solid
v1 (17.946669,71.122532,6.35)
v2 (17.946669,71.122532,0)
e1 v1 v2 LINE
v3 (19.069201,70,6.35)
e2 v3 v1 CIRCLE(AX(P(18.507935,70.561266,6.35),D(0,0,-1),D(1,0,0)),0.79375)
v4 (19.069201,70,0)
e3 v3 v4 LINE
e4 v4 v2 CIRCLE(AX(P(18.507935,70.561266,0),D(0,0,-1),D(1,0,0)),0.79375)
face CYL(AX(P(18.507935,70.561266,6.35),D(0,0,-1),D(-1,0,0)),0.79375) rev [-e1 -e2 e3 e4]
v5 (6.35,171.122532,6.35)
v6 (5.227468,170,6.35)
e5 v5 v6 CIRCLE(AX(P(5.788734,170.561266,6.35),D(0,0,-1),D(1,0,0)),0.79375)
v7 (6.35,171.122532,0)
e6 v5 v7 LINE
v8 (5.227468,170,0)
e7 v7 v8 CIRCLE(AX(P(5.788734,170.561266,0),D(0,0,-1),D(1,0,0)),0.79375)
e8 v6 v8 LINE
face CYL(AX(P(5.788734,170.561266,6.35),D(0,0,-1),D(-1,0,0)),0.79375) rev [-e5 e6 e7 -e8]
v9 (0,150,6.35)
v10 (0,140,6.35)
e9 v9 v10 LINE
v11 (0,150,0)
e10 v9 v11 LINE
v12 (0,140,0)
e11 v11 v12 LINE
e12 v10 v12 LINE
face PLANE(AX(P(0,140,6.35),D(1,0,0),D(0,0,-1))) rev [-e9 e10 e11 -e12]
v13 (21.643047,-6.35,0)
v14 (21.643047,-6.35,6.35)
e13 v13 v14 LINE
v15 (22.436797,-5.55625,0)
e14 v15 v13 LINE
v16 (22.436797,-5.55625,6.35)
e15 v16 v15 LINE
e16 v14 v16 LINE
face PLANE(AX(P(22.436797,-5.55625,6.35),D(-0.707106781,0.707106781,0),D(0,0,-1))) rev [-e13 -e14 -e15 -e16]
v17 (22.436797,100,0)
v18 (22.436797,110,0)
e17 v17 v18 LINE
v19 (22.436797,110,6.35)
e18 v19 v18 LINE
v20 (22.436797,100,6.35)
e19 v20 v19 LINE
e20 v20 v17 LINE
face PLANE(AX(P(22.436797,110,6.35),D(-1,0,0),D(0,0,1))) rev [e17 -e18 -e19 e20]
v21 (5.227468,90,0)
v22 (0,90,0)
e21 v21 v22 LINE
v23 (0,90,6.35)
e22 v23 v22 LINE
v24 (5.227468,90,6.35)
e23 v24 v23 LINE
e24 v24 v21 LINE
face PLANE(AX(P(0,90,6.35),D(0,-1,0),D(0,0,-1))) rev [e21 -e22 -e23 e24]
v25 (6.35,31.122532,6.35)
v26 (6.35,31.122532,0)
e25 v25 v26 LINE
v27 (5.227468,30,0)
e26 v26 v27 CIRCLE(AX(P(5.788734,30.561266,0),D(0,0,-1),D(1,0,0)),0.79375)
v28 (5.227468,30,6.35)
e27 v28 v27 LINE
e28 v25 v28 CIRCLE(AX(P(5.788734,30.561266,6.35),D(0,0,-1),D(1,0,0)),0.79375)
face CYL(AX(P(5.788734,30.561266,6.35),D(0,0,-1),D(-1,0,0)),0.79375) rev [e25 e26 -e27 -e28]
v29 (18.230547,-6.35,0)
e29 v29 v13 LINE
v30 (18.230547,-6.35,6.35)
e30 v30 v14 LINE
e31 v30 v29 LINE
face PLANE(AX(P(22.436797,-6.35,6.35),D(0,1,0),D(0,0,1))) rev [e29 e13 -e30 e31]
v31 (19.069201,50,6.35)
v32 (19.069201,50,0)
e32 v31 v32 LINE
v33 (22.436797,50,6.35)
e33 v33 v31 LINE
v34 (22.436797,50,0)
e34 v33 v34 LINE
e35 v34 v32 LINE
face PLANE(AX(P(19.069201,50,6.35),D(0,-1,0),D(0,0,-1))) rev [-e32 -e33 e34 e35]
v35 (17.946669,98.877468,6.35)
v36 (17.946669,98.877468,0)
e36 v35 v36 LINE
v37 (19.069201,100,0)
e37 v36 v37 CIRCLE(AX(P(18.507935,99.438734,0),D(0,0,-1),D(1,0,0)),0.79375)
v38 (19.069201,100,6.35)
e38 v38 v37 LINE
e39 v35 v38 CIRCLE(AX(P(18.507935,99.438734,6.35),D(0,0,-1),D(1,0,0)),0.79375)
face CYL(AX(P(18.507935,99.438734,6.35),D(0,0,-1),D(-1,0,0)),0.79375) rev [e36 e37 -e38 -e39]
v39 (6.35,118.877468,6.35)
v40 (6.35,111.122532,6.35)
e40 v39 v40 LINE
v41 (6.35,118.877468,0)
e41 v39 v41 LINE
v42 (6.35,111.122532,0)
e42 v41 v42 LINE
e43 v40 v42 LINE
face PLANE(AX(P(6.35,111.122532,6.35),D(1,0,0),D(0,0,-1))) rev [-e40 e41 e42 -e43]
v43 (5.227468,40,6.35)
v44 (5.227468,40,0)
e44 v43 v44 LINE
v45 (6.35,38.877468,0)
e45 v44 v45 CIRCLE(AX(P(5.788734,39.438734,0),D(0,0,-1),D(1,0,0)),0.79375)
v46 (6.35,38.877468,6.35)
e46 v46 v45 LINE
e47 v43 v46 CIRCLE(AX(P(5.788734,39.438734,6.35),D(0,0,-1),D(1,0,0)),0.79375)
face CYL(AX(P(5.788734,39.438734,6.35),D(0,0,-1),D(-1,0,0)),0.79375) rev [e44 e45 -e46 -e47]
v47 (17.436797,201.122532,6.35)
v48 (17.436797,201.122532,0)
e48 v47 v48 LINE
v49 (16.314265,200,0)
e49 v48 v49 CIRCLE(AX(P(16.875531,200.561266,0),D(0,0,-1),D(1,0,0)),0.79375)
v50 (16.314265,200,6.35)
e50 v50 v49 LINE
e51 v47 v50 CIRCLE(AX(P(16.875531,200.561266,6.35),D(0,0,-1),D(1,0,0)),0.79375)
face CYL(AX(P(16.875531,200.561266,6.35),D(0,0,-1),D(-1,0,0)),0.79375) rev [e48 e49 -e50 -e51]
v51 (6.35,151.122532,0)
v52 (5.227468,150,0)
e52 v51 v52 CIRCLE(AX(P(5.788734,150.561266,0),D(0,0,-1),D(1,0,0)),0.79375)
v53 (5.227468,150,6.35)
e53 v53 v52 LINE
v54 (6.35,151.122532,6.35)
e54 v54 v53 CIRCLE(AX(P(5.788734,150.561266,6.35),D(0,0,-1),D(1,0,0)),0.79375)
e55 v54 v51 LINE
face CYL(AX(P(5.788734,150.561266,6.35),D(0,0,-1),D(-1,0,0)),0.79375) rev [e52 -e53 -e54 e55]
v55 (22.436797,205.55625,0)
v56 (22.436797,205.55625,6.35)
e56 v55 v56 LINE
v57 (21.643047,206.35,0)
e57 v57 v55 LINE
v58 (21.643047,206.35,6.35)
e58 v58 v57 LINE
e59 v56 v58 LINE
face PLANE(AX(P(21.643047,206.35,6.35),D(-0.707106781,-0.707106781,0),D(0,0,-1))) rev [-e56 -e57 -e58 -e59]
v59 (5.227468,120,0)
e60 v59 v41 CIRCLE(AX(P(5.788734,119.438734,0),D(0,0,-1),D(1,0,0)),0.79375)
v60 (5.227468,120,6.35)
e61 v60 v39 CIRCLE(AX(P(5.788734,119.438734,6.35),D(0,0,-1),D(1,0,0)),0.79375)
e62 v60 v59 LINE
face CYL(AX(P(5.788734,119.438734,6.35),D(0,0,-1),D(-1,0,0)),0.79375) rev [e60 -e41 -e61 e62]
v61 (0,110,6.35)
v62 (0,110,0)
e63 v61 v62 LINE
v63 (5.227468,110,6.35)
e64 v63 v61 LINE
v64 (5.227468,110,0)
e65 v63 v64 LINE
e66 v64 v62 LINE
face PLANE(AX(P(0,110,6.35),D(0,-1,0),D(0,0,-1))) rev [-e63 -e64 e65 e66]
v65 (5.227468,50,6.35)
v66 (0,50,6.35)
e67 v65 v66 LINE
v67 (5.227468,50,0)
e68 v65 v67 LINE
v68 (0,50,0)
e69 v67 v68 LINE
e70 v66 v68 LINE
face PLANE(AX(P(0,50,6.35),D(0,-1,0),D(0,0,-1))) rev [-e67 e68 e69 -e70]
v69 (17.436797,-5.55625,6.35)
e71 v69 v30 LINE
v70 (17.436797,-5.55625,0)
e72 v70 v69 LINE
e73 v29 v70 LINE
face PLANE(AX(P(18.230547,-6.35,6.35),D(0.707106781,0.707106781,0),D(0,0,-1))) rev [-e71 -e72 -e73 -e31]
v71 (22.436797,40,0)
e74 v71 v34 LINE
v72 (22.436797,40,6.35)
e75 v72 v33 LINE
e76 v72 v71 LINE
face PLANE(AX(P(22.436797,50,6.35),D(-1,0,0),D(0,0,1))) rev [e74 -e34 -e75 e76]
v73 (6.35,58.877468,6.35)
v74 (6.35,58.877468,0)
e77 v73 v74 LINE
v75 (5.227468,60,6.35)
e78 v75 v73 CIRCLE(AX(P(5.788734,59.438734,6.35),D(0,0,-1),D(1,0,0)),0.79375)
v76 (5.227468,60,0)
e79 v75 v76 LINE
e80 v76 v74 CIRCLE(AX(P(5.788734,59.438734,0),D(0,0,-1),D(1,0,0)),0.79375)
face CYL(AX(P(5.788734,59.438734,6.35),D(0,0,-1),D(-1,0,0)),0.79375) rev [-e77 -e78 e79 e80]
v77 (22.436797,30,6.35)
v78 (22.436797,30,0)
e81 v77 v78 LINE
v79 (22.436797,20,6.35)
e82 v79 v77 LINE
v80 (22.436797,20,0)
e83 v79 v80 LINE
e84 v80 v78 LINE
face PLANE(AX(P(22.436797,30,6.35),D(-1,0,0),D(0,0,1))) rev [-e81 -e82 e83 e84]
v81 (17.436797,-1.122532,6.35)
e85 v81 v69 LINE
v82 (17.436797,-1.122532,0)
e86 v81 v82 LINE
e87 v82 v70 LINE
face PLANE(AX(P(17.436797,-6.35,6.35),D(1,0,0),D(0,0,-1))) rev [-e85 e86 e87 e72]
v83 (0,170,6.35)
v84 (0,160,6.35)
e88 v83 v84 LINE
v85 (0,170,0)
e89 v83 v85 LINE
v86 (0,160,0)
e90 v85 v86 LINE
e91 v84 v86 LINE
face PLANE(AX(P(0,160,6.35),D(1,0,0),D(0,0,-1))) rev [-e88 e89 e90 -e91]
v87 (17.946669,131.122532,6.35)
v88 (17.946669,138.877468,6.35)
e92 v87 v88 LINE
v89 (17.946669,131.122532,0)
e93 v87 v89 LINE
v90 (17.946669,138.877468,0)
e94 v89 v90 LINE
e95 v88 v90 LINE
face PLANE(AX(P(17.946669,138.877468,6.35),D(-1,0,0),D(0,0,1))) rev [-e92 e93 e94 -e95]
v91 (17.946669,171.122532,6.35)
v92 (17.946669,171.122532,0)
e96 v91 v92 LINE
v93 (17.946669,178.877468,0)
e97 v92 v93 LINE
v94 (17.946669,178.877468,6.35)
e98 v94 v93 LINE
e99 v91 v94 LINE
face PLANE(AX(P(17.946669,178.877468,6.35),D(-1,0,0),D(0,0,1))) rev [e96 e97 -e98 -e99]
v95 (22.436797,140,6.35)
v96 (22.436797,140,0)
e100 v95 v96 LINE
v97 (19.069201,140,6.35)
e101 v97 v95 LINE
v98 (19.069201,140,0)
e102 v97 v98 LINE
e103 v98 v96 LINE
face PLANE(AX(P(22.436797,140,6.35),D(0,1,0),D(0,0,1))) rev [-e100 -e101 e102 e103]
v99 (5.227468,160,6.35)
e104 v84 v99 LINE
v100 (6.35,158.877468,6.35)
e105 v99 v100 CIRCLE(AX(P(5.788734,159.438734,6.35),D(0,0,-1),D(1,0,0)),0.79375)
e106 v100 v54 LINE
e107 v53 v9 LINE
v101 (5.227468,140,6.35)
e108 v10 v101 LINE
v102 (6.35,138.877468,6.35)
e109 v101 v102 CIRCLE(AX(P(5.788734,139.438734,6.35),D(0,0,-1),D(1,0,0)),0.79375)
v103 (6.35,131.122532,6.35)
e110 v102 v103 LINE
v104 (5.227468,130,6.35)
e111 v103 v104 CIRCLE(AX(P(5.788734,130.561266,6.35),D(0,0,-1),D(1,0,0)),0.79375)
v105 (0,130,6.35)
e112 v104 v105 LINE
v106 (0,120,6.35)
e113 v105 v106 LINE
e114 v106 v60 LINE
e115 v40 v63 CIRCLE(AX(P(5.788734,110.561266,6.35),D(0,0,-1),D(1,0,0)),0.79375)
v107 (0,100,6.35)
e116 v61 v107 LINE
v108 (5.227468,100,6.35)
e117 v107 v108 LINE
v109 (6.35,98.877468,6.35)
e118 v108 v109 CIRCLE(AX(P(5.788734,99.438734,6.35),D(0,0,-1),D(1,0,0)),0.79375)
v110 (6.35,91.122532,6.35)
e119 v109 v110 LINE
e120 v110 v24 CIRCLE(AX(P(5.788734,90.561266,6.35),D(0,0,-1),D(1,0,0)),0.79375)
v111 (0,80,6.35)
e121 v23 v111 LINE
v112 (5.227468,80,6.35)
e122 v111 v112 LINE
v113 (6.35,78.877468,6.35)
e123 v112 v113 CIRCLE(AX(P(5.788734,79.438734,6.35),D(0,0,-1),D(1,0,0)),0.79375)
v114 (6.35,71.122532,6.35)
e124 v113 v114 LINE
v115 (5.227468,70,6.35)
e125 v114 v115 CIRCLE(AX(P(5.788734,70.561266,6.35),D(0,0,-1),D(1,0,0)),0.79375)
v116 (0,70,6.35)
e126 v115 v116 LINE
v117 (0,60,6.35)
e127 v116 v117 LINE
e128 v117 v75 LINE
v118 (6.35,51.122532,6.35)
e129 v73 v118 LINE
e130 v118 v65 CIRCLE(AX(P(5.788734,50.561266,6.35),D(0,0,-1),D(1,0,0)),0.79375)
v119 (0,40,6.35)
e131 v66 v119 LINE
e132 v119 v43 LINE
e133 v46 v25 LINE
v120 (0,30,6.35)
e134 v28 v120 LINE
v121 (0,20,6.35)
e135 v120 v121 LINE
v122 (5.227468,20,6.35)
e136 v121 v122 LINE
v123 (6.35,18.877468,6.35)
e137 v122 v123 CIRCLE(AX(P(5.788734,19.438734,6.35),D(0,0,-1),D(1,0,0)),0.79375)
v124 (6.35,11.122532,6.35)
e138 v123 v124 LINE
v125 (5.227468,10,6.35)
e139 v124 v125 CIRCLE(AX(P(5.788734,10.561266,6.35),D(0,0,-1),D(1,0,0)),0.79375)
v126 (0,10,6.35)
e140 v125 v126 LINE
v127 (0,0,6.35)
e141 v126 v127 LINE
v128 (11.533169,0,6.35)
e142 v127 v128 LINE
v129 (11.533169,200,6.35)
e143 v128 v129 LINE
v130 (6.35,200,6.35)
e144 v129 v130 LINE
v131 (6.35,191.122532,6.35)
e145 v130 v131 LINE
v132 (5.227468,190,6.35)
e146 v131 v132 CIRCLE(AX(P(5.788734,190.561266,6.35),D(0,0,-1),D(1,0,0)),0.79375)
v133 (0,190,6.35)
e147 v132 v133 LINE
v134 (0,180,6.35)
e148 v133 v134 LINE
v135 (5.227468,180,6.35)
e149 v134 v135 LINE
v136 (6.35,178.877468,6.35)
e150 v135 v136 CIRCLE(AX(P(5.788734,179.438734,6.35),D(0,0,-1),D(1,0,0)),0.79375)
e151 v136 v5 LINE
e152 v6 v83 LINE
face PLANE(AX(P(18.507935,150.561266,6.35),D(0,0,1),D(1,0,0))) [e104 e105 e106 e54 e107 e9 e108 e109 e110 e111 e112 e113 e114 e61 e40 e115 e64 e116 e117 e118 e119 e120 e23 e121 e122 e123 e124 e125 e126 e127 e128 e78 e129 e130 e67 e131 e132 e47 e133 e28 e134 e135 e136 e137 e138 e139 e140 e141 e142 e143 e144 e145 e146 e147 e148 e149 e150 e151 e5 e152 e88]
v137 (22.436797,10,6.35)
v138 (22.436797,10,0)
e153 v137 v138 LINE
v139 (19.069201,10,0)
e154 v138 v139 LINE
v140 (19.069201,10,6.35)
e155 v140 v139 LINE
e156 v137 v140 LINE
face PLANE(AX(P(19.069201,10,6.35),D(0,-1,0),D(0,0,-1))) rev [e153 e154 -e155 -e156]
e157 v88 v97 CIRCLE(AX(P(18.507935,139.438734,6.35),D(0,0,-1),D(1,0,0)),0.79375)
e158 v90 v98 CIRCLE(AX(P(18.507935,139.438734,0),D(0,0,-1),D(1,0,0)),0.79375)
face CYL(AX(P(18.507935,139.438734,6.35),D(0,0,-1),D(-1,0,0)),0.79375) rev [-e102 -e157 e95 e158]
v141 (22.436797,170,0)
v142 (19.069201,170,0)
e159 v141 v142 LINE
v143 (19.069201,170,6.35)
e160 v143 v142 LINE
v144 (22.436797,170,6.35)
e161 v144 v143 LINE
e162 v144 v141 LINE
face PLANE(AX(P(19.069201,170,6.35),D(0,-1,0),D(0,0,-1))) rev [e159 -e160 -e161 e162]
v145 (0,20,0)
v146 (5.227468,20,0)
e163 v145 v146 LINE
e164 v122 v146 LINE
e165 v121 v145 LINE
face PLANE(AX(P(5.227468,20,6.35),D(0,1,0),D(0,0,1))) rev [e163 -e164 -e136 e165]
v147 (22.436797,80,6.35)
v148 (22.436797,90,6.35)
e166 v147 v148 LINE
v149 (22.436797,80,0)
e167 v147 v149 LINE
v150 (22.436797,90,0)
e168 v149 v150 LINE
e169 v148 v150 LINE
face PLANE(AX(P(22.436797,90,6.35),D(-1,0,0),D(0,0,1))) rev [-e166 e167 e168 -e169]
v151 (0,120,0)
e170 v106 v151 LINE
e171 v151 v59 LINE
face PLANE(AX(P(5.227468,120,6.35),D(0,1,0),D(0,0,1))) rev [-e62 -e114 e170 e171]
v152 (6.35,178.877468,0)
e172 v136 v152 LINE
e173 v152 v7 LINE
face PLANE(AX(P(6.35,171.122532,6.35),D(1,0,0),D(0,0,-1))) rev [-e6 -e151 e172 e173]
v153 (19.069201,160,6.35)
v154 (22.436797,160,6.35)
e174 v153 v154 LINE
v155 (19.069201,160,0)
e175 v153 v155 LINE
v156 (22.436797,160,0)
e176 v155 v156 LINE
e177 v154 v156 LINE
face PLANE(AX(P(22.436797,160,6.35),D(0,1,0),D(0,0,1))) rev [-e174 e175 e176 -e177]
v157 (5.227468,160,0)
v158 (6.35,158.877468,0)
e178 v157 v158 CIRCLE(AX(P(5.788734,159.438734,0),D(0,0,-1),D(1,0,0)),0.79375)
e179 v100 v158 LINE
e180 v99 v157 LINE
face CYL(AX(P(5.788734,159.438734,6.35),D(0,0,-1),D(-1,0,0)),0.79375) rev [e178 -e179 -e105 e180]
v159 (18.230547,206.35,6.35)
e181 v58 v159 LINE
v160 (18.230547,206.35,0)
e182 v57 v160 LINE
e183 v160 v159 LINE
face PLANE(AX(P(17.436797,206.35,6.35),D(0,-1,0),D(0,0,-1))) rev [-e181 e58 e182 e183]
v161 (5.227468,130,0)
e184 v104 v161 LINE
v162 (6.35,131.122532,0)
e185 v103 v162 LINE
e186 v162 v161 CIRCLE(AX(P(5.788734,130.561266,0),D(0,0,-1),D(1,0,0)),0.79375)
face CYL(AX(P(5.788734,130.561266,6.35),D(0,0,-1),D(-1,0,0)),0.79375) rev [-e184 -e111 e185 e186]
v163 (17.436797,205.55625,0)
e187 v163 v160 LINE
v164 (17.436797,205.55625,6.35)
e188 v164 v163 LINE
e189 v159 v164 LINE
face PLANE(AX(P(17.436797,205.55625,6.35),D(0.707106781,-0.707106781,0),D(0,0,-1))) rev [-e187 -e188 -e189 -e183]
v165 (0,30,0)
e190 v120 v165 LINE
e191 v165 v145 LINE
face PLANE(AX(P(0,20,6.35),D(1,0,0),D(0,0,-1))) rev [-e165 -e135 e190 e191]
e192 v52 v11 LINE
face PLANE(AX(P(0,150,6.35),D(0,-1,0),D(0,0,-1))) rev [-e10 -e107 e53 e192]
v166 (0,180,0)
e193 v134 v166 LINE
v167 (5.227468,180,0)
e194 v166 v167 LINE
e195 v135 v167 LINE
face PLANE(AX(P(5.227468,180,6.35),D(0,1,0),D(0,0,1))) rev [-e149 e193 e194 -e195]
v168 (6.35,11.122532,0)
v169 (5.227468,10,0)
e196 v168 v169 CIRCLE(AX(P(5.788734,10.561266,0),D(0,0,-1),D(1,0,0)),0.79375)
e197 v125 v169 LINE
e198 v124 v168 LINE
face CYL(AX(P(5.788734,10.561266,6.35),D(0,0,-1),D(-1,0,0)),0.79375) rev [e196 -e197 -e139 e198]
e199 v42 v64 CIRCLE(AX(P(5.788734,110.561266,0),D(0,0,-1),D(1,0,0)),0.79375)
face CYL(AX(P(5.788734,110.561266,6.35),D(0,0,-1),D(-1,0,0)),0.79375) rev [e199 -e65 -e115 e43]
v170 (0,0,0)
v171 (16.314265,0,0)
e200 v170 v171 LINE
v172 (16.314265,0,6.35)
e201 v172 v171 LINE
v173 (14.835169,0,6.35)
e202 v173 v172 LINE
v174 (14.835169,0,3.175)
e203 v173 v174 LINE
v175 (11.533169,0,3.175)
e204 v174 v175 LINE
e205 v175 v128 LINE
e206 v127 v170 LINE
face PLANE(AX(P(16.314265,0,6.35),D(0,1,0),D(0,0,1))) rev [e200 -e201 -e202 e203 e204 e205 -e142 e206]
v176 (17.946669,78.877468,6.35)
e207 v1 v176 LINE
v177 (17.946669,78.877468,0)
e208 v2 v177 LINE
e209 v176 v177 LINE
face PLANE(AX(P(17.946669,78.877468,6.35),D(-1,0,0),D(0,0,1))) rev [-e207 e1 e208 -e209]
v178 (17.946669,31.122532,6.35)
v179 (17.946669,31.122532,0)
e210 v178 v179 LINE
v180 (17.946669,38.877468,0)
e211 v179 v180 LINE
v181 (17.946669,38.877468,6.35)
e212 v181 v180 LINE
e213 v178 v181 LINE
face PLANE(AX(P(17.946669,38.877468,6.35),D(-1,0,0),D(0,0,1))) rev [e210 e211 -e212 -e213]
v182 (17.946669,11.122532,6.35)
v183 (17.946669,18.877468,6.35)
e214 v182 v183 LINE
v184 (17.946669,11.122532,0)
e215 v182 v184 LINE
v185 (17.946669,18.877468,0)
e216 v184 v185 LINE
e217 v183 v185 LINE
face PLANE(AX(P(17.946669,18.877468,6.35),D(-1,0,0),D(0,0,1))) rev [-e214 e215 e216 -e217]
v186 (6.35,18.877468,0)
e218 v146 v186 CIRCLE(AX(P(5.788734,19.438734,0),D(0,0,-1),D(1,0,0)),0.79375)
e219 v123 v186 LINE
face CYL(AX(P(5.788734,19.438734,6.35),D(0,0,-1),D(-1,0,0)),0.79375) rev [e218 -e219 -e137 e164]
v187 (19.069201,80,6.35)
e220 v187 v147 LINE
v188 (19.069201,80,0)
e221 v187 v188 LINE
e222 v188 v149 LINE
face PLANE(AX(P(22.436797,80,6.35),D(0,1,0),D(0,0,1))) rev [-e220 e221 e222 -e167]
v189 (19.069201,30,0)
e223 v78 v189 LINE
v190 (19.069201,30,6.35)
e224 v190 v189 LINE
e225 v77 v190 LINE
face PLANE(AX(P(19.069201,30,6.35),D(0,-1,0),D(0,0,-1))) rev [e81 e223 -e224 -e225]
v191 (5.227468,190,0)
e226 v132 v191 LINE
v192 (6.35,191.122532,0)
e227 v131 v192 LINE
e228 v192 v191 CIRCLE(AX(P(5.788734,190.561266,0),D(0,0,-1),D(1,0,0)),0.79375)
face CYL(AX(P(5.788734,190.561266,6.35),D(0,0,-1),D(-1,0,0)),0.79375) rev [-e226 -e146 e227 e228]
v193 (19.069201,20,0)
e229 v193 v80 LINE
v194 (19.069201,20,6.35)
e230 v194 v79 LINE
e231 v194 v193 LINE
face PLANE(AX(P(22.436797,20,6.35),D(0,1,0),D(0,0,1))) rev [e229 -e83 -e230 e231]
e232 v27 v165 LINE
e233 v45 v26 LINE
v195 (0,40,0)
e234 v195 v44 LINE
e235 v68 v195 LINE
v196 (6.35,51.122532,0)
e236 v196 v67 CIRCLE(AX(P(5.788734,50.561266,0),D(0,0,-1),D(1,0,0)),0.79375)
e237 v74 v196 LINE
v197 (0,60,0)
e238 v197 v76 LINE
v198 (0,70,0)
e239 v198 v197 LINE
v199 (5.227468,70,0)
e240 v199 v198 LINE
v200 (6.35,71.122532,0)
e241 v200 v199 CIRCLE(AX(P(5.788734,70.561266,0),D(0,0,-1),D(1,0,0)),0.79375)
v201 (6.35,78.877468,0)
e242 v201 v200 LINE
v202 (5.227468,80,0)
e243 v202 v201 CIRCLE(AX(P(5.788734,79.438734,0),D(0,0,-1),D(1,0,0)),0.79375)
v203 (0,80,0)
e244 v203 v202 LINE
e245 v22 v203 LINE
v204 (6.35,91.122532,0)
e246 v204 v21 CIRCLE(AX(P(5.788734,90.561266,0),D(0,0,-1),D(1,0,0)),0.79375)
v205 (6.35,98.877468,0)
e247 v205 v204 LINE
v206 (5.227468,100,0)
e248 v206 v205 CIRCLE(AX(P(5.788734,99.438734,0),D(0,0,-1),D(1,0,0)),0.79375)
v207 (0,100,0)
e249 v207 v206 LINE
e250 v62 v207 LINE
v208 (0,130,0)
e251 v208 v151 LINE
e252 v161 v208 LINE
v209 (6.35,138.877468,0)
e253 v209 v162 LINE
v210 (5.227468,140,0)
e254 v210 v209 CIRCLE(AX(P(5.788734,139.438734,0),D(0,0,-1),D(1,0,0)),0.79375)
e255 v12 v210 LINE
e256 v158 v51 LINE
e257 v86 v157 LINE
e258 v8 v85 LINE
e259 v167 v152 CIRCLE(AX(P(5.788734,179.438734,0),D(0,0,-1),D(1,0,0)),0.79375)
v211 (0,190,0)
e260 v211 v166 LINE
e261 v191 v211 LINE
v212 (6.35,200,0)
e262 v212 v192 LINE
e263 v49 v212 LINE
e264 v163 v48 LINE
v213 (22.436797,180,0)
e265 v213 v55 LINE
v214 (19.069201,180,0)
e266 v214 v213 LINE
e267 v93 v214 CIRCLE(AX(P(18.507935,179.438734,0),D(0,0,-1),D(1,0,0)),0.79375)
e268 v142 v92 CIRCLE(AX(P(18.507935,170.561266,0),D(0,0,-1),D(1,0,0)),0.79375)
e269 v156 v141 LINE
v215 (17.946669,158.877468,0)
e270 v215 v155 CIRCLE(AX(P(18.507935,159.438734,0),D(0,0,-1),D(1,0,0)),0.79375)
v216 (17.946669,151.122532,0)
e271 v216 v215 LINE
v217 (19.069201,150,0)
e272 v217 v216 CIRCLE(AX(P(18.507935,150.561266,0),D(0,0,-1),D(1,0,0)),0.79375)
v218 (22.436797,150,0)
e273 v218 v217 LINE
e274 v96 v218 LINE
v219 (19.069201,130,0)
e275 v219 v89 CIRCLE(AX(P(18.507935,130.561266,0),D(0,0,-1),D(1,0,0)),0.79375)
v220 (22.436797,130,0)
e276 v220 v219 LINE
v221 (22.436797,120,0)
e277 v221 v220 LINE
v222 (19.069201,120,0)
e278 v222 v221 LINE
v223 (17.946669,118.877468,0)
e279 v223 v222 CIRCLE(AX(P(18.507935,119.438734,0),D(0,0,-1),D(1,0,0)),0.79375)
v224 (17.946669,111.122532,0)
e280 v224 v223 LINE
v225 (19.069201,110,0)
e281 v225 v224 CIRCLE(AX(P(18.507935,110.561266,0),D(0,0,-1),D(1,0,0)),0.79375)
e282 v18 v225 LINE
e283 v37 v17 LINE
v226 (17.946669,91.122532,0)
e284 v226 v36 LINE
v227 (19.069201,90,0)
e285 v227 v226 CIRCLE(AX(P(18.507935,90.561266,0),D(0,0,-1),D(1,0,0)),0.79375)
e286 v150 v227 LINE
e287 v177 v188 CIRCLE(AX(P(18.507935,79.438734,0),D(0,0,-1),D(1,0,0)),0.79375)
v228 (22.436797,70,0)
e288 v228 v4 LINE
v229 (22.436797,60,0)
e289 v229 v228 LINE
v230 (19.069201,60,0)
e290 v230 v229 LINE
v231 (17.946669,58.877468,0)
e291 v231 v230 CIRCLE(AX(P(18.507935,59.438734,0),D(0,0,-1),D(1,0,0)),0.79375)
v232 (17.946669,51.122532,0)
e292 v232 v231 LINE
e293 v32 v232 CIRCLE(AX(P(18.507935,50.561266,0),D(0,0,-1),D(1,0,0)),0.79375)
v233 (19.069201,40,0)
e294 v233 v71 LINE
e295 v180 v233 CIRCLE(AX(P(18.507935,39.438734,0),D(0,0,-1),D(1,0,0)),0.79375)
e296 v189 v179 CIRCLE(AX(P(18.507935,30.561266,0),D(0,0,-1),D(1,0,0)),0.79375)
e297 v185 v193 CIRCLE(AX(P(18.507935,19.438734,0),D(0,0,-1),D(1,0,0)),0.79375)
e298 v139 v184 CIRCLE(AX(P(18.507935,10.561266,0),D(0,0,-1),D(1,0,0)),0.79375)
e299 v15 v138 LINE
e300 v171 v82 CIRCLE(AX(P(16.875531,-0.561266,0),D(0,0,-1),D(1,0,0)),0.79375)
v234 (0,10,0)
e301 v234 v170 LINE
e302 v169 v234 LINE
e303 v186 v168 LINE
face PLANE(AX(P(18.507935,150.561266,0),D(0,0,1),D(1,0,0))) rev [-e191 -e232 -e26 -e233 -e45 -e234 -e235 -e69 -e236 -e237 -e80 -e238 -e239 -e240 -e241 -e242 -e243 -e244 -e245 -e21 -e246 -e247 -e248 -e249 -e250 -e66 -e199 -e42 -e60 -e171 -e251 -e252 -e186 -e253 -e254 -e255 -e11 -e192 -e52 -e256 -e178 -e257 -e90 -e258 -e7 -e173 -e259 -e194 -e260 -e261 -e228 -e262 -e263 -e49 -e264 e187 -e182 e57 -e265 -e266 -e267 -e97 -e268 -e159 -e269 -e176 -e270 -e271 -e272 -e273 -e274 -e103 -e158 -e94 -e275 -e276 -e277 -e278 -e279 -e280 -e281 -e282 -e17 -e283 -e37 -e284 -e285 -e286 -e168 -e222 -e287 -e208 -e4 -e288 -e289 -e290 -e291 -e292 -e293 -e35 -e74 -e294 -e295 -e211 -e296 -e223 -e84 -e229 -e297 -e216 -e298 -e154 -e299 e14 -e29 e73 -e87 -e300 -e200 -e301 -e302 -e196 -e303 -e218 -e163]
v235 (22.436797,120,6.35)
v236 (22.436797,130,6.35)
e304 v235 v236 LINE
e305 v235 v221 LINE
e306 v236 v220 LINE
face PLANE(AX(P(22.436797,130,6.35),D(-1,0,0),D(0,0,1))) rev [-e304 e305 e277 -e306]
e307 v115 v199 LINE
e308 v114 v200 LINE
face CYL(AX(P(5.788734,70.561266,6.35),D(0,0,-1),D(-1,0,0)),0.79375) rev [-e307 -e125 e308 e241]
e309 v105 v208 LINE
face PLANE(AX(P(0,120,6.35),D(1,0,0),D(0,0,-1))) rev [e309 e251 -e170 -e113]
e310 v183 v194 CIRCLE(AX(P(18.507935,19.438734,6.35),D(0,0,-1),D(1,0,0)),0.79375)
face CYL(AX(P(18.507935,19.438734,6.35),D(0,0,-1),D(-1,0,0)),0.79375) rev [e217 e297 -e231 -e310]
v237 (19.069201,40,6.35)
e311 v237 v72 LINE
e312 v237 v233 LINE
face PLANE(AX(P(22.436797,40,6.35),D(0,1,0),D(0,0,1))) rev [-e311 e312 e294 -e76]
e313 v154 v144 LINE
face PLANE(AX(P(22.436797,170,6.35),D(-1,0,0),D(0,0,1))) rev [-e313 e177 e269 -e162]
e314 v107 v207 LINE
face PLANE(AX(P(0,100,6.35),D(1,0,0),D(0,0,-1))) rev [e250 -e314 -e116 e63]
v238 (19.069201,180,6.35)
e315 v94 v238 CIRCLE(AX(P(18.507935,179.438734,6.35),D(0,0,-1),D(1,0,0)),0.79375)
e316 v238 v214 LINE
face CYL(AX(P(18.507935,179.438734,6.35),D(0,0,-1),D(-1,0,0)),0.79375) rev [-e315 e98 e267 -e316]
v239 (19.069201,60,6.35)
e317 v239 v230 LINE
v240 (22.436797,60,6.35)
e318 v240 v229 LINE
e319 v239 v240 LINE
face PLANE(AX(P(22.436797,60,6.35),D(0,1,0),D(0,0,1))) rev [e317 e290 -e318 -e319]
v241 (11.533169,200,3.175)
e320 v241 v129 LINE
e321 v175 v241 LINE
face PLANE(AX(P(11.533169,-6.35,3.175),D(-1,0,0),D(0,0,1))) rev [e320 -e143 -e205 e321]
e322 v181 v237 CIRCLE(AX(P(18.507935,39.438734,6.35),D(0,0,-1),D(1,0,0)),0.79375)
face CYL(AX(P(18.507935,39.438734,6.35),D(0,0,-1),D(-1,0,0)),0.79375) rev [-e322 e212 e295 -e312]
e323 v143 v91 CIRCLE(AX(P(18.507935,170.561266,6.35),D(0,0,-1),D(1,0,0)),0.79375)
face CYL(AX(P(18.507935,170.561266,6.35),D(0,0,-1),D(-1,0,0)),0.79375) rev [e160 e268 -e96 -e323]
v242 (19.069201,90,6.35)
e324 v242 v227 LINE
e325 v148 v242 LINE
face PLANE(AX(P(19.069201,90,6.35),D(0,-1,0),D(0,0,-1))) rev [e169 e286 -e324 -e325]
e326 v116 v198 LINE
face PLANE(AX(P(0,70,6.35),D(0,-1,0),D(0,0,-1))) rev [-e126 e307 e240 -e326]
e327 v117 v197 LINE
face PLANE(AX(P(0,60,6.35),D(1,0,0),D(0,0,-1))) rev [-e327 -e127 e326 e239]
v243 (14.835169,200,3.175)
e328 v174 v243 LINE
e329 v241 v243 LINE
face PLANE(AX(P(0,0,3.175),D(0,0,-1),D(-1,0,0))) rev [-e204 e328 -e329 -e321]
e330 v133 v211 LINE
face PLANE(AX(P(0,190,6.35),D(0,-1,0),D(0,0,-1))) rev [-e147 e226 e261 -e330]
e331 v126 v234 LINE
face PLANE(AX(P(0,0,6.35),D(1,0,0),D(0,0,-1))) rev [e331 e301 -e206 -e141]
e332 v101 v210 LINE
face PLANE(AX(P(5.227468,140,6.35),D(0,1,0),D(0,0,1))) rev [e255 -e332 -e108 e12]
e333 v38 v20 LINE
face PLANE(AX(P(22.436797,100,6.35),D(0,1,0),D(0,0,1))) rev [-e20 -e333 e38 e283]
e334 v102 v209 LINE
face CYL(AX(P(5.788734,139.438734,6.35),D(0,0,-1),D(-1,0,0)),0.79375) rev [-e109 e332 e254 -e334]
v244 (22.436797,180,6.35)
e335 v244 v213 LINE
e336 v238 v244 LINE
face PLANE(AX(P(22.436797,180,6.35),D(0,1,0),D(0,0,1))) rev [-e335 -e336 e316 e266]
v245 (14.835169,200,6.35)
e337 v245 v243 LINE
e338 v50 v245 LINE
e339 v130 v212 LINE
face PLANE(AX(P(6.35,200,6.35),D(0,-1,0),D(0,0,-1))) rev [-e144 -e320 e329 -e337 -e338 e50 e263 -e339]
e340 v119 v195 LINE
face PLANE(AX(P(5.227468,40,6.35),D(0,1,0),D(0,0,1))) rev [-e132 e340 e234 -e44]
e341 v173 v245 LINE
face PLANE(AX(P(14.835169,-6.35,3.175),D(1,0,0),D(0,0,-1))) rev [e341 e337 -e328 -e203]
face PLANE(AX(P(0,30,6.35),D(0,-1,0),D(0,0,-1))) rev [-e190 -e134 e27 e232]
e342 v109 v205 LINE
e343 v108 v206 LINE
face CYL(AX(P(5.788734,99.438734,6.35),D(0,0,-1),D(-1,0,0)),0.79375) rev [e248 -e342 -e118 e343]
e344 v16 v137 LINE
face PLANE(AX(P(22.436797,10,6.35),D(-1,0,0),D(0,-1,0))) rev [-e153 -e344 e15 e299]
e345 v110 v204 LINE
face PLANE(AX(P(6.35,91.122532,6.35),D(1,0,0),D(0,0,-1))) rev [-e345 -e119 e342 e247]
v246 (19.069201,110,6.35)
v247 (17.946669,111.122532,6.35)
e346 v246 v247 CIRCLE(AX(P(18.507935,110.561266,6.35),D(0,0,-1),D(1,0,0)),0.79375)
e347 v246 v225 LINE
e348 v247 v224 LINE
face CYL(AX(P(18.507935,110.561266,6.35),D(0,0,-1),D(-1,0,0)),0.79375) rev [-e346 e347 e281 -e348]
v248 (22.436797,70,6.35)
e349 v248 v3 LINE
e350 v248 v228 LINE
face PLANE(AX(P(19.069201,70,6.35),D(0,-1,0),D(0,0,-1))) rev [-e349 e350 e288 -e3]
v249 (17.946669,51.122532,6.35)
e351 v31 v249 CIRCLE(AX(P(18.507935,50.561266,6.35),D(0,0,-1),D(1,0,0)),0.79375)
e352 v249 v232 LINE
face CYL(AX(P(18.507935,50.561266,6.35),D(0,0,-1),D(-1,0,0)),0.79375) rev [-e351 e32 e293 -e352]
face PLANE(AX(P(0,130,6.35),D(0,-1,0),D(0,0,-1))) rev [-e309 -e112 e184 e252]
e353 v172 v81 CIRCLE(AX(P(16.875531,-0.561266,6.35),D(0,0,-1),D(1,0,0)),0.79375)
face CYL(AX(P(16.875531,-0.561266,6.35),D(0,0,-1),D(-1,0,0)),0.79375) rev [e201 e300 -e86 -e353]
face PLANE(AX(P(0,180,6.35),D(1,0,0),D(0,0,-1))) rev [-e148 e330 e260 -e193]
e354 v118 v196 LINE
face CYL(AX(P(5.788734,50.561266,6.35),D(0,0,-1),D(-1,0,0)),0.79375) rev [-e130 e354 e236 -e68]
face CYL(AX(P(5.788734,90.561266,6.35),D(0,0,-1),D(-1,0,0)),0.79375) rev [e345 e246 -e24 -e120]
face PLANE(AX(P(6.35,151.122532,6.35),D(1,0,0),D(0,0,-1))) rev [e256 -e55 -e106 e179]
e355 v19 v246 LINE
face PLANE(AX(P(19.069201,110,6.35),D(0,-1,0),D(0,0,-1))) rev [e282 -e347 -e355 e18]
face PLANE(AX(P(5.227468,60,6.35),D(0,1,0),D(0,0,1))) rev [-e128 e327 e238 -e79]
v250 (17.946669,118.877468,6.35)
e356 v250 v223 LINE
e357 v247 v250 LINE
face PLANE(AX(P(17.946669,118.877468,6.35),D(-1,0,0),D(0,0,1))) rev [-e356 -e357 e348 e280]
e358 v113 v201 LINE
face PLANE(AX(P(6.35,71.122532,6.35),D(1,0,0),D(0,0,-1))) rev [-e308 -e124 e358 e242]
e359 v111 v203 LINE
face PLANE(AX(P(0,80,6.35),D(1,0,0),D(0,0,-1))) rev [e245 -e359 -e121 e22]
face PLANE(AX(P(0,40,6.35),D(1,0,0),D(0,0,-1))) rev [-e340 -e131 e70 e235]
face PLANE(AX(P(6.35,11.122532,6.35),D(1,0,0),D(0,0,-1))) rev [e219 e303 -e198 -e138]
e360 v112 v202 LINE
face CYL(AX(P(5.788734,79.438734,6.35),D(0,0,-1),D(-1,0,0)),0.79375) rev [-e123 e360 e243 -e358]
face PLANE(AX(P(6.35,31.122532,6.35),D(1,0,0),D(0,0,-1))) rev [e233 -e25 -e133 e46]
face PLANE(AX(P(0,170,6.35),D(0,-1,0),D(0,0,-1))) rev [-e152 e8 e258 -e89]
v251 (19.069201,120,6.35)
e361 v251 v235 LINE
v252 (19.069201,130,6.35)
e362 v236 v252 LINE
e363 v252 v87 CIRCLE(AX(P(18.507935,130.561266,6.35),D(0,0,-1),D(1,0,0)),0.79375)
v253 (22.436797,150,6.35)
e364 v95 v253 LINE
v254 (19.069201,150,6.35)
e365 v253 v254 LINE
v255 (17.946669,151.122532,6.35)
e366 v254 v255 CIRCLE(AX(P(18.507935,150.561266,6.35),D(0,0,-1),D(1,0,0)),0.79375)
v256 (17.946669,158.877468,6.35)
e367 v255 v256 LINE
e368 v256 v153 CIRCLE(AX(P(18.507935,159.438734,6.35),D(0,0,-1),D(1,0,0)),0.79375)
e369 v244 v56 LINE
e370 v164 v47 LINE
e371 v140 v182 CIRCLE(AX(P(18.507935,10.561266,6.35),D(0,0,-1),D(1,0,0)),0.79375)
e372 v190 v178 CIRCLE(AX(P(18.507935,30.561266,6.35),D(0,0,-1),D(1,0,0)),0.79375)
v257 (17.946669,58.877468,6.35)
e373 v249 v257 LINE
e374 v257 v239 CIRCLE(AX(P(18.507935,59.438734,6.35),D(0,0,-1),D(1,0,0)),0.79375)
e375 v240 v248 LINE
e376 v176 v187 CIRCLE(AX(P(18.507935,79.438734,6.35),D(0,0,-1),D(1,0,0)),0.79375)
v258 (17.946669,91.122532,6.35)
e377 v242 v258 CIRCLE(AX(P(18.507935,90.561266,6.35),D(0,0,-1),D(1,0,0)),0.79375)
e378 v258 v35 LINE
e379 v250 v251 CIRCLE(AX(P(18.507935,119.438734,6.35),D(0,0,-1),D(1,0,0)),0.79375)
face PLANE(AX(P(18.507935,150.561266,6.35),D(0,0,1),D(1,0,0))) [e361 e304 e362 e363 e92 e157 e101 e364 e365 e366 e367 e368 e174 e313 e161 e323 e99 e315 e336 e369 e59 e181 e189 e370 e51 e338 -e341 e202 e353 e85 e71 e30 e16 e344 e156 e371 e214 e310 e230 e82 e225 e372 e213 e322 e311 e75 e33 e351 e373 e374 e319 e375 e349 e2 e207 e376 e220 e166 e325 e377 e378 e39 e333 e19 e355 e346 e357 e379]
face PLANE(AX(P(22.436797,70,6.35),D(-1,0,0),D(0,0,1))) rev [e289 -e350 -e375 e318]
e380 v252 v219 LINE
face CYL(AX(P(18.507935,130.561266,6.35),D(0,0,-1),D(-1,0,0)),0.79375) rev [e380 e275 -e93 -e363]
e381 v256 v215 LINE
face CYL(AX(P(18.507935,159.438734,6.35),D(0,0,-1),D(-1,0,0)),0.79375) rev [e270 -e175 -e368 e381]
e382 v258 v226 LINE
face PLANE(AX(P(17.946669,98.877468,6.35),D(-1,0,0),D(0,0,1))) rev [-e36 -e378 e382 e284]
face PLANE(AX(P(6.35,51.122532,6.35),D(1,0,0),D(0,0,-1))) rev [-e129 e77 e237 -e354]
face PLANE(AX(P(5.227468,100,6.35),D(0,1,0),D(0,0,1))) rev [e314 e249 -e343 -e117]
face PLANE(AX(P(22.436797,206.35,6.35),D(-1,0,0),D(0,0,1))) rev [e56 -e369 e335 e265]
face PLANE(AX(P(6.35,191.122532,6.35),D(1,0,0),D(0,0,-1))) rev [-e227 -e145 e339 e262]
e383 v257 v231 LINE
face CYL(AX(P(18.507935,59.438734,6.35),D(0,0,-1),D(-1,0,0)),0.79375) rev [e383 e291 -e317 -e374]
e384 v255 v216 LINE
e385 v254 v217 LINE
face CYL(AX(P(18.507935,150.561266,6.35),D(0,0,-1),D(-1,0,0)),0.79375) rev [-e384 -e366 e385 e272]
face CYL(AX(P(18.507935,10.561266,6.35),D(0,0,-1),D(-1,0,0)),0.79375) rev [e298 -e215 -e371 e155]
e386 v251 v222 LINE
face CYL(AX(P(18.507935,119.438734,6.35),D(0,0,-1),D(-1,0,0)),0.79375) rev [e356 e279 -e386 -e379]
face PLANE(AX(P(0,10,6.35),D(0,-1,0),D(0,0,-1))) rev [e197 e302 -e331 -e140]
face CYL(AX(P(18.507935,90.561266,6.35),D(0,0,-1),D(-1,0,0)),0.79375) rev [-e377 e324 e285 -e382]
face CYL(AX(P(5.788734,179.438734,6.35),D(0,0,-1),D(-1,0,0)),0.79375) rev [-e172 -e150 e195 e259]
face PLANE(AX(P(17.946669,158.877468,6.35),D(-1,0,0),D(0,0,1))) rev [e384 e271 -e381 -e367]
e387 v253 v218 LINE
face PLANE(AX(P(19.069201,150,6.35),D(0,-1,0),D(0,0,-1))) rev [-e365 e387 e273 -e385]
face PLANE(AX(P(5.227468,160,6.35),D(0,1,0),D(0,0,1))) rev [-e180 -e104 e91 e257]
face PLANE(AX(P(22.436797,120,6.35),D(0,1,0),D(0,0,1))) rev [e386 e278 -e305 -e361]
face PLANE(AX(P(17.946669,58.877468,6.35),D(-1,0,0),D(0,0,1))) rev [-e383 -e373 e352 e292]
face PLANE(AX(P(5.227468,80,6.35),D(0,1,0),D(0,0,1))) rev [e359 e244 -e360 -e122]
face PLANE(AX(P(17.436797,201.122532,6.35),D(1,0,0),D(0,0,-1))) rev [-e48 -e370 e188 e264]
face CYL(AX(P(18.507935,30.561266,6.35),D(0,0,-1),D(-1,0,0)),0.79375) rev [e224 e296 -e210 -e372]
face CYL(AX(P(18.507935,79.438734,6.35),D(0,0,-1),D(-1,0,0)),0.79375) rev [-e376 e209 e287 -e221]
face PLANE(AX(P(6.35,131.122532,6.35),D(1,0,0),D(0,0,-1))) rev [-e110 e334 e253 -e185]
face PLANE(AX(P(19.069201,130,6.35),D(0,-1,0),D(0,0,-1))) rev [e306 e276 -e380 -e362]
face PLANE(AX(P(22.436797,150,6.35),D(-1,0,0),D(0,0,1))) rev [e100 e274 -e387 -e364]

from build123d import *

# Parameters (mm, degrees)
BOSS_EXTRUDE1_DEPTH = 6.35
CUT_EXTRUDE1_DEPTH  = 3.175
CHAMFER1_SIZE       = 0.79375
SKETCH5_W           = 3.302
SKETCH5_H           = 3.175
CUT_EXTRUDE4_DEPTH  = 208.663320883


# Read off the part's stored shape, not the designer's step: Boss-Extrude1
with BuildPart() as part:
    # Boss-Extrude1 outline → Boss-Extrude1 (new body)
    with BuildSketch(Plane.XY):
        with BuildLine():
            Line((22.436796564, 150), (19.069200519, 150))
            ThreePointArc((19.069200519, 150), (17.946668504, 150), (17.946668504, 151.122532015))
            Line((17.946668504, 151.122532015), (17.946668504, 158.877467985))
            ThreePointArc((17.946668504, 158.877467985), (17.946668504, 160), (19.069200519, 160))
            Line((19.069200519, 160), (22.436796564, 160))
            Line((22.436796564, 160), (22.436796564, 170))
            Line((22.436796564, 170), (19.069200519, 170))
            ThreePointArc((19.069200519, 170), (17.946668504, 170), (17.946668504, 171.122532015))
            Line((17.946668504, 171.122532015), (17.946668504, 178.877467985))
            ThreePointArc((17.946668504, 178.877467985), (17.946668504, 180), (19.069200519, 180))
            Line((19.069200519, 180), (22.436796564, 180))
            Line((22.436796564, 180), (22.436796564, 206.35))
            Line((22.436796564, 206.35), (17.436796564, 206.35))
            Line((17.436796564, 206.35), (17.436796564, 201.122532015))
            ThreePointArc((17.436796564, 201.122532015), (17.436796564, 200), (16.314264549, 200))
            Line((16.314264549, 200), (6.35, 200))
            Line((6.35, 200), (6.35, 191.122532015))
            ThreePointArc((6.35, 191.122532015), (6.35, 190), (5.227467985, 190))
            Line((5.227467985, 190), (0, 190))
            Line((0, 190), (0, 180))
            Line((0, 180), (5.227467985, 180))
            ThreePointArc((5.227467985, 180), (6.35, 180), (6.35, 178.877467985))
            Line((6.35, 178.877467985), (6.35, 171.122532015))
            ThreePointArc((6.35, 171.122532015), (6.35, 170), (5.227467985, 170))
            Line((5.227467985, 170), (0, 170))
            Line((0, 170), (0, 160))
            Line((0, 160), (5.227467985, 160))
            ThreePointArc((5.227467985, 160), (6.35, 160), (6.35, 158.877467985))
            Line((6.35, 158.877467985), (6.35, 151.122532015))
            ThreePointArc((6.35, 151.122532015), (6.35, 150), (5.227467985, 150))
            Line((5.227467985, 150), (0, 150))
            Line((0, 150), (0, 140))
            Line((0, 140), (5.227467985, 140))
            ThreePointArc((5.227467985, 140), (6.35, 140), (6.35, 138.877467985))
            Line((6.35, 138.877467985), (6.35, 131.122532015))
            ThreePointArc((6.35, 131.122532015), (6.35, 130), (5.227467985, 130))
            Line((5.227467985, 130), (0, 130))
            Line((0, 130), (0, 120))
            Line((0, 120), (5.227467985, 120))
            ThreePointArc((5.227467985, 120), (6.35, 120), (6.35, 118.877467985))
            Line((6.35, 118.877467985), (6.35, 111.122532015))
            ThreePointArc((6.35, 111.122532015), (6.35, 110), (5.227467985, 110))
            Line((5.227467985, 110), (0, 110))
            Line((0, 110), (0, 100))
            Line((0, 100), (5.227467985, 100))
            ThreePointArc((5.227467985, 100), (6.35, 100), (6.35, 98.877467985))
            Line((6.35, 98.877467985), (6.35, 91.122532015))
            ThreePointArc((6.35, 91.122532015), (6.35, 90), (5.227467985, 90))
            Line((5.227467985, 90), (0, 90))
            Line((0, 90), (0, 80))
            Line((0, 80), (5.227467985, 80))
            ThreePointArc((5.227467985, 80), (6.35, 80), (6.35, 78.877467985))
            Line((6.35, 78.877467985), (6.35, 71.122532015))
            ThreePointArc((6.35, 71.122532015), (6.35, 70), (5.227467985, 70))
            Line((5.227467985, 70), (0, 70))
            Line((0, 70), (0, 60))
            Line((0, 60), (5.227467985, 60))
            ThreePointArc((5.227467985, 60), (6.35, 60), (6.35, 58.877467985))
            Line((6.35, 58.877467985), (6.35, 51.122532015))
            ThreePointArc((6.35, 51.122532015), (6.35, 50), (5.227467985, 50))
            Line((5.227467985, 50), (0, 50))
            Line((0, 50), (0, 40))
            Line((0, 40), (5.227467985, 40))
            ThreePointArc((5.227467985, 40), (6.35, 40), (6.35, 38.877467985))
            Line((6.35, 38.877467985), (6.35, 31.122532015))
            ThreePointArc((6.35, 31.122532015), (6.35, 30), (5.227467985, 30))
            Line((5.227467985, 30), (0, 30))
            Line((0, 30), (0, 20))
            Line((0, 20), (5.227467985, 20))
            ThreePointArc((5.227467985, 20), (6.35, 20), (6.35, 18.877467985))
            Line((6.35, 18.877467985), (6.35, 11.122532015))
            ThreePointArc((6.35, 11.122532015), (6.35, 10), (5.227467985, 10))
            Line((5.227467985, 10), (0, 10))
            Line((0, 10), (0, 0))
            Line((0, 0), (16.314264549, 0))
            ThreePointArc((16.314264549, 0), (17.436796564, 0), (17.436796564, -1.122532015))
            Line((17.436796564, -1.122532015), (17.436796564, -6.35))
            Line((17.436796564, -6.35), (22.436796564, -6.35))
            Line((22.436796564, -6.35), (22.436796564, 10))
            Line((22.436796564, 10), (19.069200519, 10))
            ThreePointArc((19.069200519, 10), (17.946668504, 10), (17.946668504, 11.122532015))
            Line((17.946668504, 11.122532015), (17.946668504, 18.877467985))
            ThreePointArc((17.946668504, 18.877467985), (17.946668504, 20), (19.069200519, 20))
            Line((19.069200519, 20), (22.436796564, 20))
            Line((22.436796564, 20), (22.436796564, 30))
            Line((22.436796564, 30), (19.069200519, 30))
            ThreePointArc((19.069200519, 30), (17.946668504, 30), (17.946668504, 31.122532015))
            Line((17.946668504, 31.122532015), (17.946668504, 38.877467985))
            ThreePointArc((17.946668504, 38.877467985), (17.946668504, 40), (19.069200519, 40))
            Line((19.069200519, 40), (22.436796564, 40))
            Line((22.436796564, 40), (22.436796564, 50))
            Line((22.436796564, 50), (19.069200519, 50))
            ThreePointArc((19.069200519, 50), (17.946668504, 50), (17.946668504, 51.122532015))
            Line((17.946668504, 51.122532015), (17.946668504, 58.877467985))
            ThreePointArc((17.946668504, 58.877467985), (17.946668504, 60), (19.069200519, 60))
            Line((19.069200519, 60), (22.436796564, 60))
            Line((22.436796564, 60), (22.436796564, 70))
            Line((22.436796564, 70), (19.069200519, 70))
            ThreePointArc((19.069200519, 70), (17.946668504, 70), (17.946668504, 71.122532015))
            Line((17.946668504, 71.122532015), (17.946668504, 78.877467985))
            ThreePointArc((17.946668504, 78.877467985), (17.946668504, 80), (19.069200519, 80))
            Line((19.069200519, 80), (22.436796564, 80))
            Line((22.436796564, 80), (22.436796564, 90))
            Line((22.436796564, 90), (19.069200519, 90))
            ThreePointArc((19.069200519, 90), (17.946668504, 90), (17.946668504, 91.122532015))
            Line((17.946668504, 91.122532015), (17.946668504, 98.877467985))
            ThreePointArc((17.946668504, 98.877467985), (17.946668504, 100), (19.069200519, 100))
            Line((19.069200519, 100), (22.436796564, 100))
            Line((22.436796564, 100), (22.436796564, 110))
            Line((22.436796564, 110), (19.069200519, 110))
            ThreePointArc((19.069200519, 110), (17.946668504, 110), (17.946668504, 111.122532015))
            Line((17.946668504, 111.122532015), (17.946668504, 118.877467985))
            ThreePointArc((17.946668504, 118.877467985), (17.946668504, 120), (19.069200519, 120))
            Line((19.069200519, 120), (22.436796564, 120))
            Line((22.436796564, 120), (22.436796564, 130))
            Line((22.436796564, 130), (19.069200519, 130))
            ThreePointArc((19.069200519, 130), (17.946668504, 130), (17.946668504, 131.122532015))
            Line((17.946668504, 131.122532015), (17.946668504, 138.877467985))
            ThreePointArc((17.946668504, 138.877467985), (17.946668504, 140), (19.069200519, 140))
            Line((19.069200519, 140), (22.436796564, 140))
            Line((22.436796564, 140), (22.436796564, 150))
        make_face()
    extrude(amount=BOSS_EXTRUDE1_DEPTH)

    # Sketch2 → Cut-Extrude1 (cut)
    with BuildSketch(Plane.XY.offset(6.35)):
        Polygon((14.771668504, -1.25), (11.596668504, -1.25), (11.596668504, 200), (11.596668504, 201.5875), (14.771668504, 201.5875), (14.771668504, 0), align=None)
    extrude(amount=-CUT_EXTRUDE1_DEPTH, mode=Mode.SUBTRACT)

    # Chamfer1
    chamfer1_edges = [part.edges().sort_by_distance(p)[0] for p in [
        (22.436796564, -6.35, 3.175),
        (17.436796564, -6.35, 3.175),
        (17.436796564, 206.35, 3.175),
        (22.436796564, 206.35, 3.175),
    ]]
    chamfer(chamfer1_edges, length=CHAMFER1_SIZE)

    # Sketch5 → Cut-Extrude4 (cut, through all)
    with BuildSketch(Plane(origin=(0, 200, 0), x_dir=(1, 0, 0), z_dir=(0, 1, 0))):
        with Locations((13.184168504, -4.7625)):
            Rectangle(SKETCH5_W, SKETCH5_H)
    extrude(amount=-CUT_EXTRUDE4_DEPTH, mode=Mode.SUBTRACT)


solid = part.part
